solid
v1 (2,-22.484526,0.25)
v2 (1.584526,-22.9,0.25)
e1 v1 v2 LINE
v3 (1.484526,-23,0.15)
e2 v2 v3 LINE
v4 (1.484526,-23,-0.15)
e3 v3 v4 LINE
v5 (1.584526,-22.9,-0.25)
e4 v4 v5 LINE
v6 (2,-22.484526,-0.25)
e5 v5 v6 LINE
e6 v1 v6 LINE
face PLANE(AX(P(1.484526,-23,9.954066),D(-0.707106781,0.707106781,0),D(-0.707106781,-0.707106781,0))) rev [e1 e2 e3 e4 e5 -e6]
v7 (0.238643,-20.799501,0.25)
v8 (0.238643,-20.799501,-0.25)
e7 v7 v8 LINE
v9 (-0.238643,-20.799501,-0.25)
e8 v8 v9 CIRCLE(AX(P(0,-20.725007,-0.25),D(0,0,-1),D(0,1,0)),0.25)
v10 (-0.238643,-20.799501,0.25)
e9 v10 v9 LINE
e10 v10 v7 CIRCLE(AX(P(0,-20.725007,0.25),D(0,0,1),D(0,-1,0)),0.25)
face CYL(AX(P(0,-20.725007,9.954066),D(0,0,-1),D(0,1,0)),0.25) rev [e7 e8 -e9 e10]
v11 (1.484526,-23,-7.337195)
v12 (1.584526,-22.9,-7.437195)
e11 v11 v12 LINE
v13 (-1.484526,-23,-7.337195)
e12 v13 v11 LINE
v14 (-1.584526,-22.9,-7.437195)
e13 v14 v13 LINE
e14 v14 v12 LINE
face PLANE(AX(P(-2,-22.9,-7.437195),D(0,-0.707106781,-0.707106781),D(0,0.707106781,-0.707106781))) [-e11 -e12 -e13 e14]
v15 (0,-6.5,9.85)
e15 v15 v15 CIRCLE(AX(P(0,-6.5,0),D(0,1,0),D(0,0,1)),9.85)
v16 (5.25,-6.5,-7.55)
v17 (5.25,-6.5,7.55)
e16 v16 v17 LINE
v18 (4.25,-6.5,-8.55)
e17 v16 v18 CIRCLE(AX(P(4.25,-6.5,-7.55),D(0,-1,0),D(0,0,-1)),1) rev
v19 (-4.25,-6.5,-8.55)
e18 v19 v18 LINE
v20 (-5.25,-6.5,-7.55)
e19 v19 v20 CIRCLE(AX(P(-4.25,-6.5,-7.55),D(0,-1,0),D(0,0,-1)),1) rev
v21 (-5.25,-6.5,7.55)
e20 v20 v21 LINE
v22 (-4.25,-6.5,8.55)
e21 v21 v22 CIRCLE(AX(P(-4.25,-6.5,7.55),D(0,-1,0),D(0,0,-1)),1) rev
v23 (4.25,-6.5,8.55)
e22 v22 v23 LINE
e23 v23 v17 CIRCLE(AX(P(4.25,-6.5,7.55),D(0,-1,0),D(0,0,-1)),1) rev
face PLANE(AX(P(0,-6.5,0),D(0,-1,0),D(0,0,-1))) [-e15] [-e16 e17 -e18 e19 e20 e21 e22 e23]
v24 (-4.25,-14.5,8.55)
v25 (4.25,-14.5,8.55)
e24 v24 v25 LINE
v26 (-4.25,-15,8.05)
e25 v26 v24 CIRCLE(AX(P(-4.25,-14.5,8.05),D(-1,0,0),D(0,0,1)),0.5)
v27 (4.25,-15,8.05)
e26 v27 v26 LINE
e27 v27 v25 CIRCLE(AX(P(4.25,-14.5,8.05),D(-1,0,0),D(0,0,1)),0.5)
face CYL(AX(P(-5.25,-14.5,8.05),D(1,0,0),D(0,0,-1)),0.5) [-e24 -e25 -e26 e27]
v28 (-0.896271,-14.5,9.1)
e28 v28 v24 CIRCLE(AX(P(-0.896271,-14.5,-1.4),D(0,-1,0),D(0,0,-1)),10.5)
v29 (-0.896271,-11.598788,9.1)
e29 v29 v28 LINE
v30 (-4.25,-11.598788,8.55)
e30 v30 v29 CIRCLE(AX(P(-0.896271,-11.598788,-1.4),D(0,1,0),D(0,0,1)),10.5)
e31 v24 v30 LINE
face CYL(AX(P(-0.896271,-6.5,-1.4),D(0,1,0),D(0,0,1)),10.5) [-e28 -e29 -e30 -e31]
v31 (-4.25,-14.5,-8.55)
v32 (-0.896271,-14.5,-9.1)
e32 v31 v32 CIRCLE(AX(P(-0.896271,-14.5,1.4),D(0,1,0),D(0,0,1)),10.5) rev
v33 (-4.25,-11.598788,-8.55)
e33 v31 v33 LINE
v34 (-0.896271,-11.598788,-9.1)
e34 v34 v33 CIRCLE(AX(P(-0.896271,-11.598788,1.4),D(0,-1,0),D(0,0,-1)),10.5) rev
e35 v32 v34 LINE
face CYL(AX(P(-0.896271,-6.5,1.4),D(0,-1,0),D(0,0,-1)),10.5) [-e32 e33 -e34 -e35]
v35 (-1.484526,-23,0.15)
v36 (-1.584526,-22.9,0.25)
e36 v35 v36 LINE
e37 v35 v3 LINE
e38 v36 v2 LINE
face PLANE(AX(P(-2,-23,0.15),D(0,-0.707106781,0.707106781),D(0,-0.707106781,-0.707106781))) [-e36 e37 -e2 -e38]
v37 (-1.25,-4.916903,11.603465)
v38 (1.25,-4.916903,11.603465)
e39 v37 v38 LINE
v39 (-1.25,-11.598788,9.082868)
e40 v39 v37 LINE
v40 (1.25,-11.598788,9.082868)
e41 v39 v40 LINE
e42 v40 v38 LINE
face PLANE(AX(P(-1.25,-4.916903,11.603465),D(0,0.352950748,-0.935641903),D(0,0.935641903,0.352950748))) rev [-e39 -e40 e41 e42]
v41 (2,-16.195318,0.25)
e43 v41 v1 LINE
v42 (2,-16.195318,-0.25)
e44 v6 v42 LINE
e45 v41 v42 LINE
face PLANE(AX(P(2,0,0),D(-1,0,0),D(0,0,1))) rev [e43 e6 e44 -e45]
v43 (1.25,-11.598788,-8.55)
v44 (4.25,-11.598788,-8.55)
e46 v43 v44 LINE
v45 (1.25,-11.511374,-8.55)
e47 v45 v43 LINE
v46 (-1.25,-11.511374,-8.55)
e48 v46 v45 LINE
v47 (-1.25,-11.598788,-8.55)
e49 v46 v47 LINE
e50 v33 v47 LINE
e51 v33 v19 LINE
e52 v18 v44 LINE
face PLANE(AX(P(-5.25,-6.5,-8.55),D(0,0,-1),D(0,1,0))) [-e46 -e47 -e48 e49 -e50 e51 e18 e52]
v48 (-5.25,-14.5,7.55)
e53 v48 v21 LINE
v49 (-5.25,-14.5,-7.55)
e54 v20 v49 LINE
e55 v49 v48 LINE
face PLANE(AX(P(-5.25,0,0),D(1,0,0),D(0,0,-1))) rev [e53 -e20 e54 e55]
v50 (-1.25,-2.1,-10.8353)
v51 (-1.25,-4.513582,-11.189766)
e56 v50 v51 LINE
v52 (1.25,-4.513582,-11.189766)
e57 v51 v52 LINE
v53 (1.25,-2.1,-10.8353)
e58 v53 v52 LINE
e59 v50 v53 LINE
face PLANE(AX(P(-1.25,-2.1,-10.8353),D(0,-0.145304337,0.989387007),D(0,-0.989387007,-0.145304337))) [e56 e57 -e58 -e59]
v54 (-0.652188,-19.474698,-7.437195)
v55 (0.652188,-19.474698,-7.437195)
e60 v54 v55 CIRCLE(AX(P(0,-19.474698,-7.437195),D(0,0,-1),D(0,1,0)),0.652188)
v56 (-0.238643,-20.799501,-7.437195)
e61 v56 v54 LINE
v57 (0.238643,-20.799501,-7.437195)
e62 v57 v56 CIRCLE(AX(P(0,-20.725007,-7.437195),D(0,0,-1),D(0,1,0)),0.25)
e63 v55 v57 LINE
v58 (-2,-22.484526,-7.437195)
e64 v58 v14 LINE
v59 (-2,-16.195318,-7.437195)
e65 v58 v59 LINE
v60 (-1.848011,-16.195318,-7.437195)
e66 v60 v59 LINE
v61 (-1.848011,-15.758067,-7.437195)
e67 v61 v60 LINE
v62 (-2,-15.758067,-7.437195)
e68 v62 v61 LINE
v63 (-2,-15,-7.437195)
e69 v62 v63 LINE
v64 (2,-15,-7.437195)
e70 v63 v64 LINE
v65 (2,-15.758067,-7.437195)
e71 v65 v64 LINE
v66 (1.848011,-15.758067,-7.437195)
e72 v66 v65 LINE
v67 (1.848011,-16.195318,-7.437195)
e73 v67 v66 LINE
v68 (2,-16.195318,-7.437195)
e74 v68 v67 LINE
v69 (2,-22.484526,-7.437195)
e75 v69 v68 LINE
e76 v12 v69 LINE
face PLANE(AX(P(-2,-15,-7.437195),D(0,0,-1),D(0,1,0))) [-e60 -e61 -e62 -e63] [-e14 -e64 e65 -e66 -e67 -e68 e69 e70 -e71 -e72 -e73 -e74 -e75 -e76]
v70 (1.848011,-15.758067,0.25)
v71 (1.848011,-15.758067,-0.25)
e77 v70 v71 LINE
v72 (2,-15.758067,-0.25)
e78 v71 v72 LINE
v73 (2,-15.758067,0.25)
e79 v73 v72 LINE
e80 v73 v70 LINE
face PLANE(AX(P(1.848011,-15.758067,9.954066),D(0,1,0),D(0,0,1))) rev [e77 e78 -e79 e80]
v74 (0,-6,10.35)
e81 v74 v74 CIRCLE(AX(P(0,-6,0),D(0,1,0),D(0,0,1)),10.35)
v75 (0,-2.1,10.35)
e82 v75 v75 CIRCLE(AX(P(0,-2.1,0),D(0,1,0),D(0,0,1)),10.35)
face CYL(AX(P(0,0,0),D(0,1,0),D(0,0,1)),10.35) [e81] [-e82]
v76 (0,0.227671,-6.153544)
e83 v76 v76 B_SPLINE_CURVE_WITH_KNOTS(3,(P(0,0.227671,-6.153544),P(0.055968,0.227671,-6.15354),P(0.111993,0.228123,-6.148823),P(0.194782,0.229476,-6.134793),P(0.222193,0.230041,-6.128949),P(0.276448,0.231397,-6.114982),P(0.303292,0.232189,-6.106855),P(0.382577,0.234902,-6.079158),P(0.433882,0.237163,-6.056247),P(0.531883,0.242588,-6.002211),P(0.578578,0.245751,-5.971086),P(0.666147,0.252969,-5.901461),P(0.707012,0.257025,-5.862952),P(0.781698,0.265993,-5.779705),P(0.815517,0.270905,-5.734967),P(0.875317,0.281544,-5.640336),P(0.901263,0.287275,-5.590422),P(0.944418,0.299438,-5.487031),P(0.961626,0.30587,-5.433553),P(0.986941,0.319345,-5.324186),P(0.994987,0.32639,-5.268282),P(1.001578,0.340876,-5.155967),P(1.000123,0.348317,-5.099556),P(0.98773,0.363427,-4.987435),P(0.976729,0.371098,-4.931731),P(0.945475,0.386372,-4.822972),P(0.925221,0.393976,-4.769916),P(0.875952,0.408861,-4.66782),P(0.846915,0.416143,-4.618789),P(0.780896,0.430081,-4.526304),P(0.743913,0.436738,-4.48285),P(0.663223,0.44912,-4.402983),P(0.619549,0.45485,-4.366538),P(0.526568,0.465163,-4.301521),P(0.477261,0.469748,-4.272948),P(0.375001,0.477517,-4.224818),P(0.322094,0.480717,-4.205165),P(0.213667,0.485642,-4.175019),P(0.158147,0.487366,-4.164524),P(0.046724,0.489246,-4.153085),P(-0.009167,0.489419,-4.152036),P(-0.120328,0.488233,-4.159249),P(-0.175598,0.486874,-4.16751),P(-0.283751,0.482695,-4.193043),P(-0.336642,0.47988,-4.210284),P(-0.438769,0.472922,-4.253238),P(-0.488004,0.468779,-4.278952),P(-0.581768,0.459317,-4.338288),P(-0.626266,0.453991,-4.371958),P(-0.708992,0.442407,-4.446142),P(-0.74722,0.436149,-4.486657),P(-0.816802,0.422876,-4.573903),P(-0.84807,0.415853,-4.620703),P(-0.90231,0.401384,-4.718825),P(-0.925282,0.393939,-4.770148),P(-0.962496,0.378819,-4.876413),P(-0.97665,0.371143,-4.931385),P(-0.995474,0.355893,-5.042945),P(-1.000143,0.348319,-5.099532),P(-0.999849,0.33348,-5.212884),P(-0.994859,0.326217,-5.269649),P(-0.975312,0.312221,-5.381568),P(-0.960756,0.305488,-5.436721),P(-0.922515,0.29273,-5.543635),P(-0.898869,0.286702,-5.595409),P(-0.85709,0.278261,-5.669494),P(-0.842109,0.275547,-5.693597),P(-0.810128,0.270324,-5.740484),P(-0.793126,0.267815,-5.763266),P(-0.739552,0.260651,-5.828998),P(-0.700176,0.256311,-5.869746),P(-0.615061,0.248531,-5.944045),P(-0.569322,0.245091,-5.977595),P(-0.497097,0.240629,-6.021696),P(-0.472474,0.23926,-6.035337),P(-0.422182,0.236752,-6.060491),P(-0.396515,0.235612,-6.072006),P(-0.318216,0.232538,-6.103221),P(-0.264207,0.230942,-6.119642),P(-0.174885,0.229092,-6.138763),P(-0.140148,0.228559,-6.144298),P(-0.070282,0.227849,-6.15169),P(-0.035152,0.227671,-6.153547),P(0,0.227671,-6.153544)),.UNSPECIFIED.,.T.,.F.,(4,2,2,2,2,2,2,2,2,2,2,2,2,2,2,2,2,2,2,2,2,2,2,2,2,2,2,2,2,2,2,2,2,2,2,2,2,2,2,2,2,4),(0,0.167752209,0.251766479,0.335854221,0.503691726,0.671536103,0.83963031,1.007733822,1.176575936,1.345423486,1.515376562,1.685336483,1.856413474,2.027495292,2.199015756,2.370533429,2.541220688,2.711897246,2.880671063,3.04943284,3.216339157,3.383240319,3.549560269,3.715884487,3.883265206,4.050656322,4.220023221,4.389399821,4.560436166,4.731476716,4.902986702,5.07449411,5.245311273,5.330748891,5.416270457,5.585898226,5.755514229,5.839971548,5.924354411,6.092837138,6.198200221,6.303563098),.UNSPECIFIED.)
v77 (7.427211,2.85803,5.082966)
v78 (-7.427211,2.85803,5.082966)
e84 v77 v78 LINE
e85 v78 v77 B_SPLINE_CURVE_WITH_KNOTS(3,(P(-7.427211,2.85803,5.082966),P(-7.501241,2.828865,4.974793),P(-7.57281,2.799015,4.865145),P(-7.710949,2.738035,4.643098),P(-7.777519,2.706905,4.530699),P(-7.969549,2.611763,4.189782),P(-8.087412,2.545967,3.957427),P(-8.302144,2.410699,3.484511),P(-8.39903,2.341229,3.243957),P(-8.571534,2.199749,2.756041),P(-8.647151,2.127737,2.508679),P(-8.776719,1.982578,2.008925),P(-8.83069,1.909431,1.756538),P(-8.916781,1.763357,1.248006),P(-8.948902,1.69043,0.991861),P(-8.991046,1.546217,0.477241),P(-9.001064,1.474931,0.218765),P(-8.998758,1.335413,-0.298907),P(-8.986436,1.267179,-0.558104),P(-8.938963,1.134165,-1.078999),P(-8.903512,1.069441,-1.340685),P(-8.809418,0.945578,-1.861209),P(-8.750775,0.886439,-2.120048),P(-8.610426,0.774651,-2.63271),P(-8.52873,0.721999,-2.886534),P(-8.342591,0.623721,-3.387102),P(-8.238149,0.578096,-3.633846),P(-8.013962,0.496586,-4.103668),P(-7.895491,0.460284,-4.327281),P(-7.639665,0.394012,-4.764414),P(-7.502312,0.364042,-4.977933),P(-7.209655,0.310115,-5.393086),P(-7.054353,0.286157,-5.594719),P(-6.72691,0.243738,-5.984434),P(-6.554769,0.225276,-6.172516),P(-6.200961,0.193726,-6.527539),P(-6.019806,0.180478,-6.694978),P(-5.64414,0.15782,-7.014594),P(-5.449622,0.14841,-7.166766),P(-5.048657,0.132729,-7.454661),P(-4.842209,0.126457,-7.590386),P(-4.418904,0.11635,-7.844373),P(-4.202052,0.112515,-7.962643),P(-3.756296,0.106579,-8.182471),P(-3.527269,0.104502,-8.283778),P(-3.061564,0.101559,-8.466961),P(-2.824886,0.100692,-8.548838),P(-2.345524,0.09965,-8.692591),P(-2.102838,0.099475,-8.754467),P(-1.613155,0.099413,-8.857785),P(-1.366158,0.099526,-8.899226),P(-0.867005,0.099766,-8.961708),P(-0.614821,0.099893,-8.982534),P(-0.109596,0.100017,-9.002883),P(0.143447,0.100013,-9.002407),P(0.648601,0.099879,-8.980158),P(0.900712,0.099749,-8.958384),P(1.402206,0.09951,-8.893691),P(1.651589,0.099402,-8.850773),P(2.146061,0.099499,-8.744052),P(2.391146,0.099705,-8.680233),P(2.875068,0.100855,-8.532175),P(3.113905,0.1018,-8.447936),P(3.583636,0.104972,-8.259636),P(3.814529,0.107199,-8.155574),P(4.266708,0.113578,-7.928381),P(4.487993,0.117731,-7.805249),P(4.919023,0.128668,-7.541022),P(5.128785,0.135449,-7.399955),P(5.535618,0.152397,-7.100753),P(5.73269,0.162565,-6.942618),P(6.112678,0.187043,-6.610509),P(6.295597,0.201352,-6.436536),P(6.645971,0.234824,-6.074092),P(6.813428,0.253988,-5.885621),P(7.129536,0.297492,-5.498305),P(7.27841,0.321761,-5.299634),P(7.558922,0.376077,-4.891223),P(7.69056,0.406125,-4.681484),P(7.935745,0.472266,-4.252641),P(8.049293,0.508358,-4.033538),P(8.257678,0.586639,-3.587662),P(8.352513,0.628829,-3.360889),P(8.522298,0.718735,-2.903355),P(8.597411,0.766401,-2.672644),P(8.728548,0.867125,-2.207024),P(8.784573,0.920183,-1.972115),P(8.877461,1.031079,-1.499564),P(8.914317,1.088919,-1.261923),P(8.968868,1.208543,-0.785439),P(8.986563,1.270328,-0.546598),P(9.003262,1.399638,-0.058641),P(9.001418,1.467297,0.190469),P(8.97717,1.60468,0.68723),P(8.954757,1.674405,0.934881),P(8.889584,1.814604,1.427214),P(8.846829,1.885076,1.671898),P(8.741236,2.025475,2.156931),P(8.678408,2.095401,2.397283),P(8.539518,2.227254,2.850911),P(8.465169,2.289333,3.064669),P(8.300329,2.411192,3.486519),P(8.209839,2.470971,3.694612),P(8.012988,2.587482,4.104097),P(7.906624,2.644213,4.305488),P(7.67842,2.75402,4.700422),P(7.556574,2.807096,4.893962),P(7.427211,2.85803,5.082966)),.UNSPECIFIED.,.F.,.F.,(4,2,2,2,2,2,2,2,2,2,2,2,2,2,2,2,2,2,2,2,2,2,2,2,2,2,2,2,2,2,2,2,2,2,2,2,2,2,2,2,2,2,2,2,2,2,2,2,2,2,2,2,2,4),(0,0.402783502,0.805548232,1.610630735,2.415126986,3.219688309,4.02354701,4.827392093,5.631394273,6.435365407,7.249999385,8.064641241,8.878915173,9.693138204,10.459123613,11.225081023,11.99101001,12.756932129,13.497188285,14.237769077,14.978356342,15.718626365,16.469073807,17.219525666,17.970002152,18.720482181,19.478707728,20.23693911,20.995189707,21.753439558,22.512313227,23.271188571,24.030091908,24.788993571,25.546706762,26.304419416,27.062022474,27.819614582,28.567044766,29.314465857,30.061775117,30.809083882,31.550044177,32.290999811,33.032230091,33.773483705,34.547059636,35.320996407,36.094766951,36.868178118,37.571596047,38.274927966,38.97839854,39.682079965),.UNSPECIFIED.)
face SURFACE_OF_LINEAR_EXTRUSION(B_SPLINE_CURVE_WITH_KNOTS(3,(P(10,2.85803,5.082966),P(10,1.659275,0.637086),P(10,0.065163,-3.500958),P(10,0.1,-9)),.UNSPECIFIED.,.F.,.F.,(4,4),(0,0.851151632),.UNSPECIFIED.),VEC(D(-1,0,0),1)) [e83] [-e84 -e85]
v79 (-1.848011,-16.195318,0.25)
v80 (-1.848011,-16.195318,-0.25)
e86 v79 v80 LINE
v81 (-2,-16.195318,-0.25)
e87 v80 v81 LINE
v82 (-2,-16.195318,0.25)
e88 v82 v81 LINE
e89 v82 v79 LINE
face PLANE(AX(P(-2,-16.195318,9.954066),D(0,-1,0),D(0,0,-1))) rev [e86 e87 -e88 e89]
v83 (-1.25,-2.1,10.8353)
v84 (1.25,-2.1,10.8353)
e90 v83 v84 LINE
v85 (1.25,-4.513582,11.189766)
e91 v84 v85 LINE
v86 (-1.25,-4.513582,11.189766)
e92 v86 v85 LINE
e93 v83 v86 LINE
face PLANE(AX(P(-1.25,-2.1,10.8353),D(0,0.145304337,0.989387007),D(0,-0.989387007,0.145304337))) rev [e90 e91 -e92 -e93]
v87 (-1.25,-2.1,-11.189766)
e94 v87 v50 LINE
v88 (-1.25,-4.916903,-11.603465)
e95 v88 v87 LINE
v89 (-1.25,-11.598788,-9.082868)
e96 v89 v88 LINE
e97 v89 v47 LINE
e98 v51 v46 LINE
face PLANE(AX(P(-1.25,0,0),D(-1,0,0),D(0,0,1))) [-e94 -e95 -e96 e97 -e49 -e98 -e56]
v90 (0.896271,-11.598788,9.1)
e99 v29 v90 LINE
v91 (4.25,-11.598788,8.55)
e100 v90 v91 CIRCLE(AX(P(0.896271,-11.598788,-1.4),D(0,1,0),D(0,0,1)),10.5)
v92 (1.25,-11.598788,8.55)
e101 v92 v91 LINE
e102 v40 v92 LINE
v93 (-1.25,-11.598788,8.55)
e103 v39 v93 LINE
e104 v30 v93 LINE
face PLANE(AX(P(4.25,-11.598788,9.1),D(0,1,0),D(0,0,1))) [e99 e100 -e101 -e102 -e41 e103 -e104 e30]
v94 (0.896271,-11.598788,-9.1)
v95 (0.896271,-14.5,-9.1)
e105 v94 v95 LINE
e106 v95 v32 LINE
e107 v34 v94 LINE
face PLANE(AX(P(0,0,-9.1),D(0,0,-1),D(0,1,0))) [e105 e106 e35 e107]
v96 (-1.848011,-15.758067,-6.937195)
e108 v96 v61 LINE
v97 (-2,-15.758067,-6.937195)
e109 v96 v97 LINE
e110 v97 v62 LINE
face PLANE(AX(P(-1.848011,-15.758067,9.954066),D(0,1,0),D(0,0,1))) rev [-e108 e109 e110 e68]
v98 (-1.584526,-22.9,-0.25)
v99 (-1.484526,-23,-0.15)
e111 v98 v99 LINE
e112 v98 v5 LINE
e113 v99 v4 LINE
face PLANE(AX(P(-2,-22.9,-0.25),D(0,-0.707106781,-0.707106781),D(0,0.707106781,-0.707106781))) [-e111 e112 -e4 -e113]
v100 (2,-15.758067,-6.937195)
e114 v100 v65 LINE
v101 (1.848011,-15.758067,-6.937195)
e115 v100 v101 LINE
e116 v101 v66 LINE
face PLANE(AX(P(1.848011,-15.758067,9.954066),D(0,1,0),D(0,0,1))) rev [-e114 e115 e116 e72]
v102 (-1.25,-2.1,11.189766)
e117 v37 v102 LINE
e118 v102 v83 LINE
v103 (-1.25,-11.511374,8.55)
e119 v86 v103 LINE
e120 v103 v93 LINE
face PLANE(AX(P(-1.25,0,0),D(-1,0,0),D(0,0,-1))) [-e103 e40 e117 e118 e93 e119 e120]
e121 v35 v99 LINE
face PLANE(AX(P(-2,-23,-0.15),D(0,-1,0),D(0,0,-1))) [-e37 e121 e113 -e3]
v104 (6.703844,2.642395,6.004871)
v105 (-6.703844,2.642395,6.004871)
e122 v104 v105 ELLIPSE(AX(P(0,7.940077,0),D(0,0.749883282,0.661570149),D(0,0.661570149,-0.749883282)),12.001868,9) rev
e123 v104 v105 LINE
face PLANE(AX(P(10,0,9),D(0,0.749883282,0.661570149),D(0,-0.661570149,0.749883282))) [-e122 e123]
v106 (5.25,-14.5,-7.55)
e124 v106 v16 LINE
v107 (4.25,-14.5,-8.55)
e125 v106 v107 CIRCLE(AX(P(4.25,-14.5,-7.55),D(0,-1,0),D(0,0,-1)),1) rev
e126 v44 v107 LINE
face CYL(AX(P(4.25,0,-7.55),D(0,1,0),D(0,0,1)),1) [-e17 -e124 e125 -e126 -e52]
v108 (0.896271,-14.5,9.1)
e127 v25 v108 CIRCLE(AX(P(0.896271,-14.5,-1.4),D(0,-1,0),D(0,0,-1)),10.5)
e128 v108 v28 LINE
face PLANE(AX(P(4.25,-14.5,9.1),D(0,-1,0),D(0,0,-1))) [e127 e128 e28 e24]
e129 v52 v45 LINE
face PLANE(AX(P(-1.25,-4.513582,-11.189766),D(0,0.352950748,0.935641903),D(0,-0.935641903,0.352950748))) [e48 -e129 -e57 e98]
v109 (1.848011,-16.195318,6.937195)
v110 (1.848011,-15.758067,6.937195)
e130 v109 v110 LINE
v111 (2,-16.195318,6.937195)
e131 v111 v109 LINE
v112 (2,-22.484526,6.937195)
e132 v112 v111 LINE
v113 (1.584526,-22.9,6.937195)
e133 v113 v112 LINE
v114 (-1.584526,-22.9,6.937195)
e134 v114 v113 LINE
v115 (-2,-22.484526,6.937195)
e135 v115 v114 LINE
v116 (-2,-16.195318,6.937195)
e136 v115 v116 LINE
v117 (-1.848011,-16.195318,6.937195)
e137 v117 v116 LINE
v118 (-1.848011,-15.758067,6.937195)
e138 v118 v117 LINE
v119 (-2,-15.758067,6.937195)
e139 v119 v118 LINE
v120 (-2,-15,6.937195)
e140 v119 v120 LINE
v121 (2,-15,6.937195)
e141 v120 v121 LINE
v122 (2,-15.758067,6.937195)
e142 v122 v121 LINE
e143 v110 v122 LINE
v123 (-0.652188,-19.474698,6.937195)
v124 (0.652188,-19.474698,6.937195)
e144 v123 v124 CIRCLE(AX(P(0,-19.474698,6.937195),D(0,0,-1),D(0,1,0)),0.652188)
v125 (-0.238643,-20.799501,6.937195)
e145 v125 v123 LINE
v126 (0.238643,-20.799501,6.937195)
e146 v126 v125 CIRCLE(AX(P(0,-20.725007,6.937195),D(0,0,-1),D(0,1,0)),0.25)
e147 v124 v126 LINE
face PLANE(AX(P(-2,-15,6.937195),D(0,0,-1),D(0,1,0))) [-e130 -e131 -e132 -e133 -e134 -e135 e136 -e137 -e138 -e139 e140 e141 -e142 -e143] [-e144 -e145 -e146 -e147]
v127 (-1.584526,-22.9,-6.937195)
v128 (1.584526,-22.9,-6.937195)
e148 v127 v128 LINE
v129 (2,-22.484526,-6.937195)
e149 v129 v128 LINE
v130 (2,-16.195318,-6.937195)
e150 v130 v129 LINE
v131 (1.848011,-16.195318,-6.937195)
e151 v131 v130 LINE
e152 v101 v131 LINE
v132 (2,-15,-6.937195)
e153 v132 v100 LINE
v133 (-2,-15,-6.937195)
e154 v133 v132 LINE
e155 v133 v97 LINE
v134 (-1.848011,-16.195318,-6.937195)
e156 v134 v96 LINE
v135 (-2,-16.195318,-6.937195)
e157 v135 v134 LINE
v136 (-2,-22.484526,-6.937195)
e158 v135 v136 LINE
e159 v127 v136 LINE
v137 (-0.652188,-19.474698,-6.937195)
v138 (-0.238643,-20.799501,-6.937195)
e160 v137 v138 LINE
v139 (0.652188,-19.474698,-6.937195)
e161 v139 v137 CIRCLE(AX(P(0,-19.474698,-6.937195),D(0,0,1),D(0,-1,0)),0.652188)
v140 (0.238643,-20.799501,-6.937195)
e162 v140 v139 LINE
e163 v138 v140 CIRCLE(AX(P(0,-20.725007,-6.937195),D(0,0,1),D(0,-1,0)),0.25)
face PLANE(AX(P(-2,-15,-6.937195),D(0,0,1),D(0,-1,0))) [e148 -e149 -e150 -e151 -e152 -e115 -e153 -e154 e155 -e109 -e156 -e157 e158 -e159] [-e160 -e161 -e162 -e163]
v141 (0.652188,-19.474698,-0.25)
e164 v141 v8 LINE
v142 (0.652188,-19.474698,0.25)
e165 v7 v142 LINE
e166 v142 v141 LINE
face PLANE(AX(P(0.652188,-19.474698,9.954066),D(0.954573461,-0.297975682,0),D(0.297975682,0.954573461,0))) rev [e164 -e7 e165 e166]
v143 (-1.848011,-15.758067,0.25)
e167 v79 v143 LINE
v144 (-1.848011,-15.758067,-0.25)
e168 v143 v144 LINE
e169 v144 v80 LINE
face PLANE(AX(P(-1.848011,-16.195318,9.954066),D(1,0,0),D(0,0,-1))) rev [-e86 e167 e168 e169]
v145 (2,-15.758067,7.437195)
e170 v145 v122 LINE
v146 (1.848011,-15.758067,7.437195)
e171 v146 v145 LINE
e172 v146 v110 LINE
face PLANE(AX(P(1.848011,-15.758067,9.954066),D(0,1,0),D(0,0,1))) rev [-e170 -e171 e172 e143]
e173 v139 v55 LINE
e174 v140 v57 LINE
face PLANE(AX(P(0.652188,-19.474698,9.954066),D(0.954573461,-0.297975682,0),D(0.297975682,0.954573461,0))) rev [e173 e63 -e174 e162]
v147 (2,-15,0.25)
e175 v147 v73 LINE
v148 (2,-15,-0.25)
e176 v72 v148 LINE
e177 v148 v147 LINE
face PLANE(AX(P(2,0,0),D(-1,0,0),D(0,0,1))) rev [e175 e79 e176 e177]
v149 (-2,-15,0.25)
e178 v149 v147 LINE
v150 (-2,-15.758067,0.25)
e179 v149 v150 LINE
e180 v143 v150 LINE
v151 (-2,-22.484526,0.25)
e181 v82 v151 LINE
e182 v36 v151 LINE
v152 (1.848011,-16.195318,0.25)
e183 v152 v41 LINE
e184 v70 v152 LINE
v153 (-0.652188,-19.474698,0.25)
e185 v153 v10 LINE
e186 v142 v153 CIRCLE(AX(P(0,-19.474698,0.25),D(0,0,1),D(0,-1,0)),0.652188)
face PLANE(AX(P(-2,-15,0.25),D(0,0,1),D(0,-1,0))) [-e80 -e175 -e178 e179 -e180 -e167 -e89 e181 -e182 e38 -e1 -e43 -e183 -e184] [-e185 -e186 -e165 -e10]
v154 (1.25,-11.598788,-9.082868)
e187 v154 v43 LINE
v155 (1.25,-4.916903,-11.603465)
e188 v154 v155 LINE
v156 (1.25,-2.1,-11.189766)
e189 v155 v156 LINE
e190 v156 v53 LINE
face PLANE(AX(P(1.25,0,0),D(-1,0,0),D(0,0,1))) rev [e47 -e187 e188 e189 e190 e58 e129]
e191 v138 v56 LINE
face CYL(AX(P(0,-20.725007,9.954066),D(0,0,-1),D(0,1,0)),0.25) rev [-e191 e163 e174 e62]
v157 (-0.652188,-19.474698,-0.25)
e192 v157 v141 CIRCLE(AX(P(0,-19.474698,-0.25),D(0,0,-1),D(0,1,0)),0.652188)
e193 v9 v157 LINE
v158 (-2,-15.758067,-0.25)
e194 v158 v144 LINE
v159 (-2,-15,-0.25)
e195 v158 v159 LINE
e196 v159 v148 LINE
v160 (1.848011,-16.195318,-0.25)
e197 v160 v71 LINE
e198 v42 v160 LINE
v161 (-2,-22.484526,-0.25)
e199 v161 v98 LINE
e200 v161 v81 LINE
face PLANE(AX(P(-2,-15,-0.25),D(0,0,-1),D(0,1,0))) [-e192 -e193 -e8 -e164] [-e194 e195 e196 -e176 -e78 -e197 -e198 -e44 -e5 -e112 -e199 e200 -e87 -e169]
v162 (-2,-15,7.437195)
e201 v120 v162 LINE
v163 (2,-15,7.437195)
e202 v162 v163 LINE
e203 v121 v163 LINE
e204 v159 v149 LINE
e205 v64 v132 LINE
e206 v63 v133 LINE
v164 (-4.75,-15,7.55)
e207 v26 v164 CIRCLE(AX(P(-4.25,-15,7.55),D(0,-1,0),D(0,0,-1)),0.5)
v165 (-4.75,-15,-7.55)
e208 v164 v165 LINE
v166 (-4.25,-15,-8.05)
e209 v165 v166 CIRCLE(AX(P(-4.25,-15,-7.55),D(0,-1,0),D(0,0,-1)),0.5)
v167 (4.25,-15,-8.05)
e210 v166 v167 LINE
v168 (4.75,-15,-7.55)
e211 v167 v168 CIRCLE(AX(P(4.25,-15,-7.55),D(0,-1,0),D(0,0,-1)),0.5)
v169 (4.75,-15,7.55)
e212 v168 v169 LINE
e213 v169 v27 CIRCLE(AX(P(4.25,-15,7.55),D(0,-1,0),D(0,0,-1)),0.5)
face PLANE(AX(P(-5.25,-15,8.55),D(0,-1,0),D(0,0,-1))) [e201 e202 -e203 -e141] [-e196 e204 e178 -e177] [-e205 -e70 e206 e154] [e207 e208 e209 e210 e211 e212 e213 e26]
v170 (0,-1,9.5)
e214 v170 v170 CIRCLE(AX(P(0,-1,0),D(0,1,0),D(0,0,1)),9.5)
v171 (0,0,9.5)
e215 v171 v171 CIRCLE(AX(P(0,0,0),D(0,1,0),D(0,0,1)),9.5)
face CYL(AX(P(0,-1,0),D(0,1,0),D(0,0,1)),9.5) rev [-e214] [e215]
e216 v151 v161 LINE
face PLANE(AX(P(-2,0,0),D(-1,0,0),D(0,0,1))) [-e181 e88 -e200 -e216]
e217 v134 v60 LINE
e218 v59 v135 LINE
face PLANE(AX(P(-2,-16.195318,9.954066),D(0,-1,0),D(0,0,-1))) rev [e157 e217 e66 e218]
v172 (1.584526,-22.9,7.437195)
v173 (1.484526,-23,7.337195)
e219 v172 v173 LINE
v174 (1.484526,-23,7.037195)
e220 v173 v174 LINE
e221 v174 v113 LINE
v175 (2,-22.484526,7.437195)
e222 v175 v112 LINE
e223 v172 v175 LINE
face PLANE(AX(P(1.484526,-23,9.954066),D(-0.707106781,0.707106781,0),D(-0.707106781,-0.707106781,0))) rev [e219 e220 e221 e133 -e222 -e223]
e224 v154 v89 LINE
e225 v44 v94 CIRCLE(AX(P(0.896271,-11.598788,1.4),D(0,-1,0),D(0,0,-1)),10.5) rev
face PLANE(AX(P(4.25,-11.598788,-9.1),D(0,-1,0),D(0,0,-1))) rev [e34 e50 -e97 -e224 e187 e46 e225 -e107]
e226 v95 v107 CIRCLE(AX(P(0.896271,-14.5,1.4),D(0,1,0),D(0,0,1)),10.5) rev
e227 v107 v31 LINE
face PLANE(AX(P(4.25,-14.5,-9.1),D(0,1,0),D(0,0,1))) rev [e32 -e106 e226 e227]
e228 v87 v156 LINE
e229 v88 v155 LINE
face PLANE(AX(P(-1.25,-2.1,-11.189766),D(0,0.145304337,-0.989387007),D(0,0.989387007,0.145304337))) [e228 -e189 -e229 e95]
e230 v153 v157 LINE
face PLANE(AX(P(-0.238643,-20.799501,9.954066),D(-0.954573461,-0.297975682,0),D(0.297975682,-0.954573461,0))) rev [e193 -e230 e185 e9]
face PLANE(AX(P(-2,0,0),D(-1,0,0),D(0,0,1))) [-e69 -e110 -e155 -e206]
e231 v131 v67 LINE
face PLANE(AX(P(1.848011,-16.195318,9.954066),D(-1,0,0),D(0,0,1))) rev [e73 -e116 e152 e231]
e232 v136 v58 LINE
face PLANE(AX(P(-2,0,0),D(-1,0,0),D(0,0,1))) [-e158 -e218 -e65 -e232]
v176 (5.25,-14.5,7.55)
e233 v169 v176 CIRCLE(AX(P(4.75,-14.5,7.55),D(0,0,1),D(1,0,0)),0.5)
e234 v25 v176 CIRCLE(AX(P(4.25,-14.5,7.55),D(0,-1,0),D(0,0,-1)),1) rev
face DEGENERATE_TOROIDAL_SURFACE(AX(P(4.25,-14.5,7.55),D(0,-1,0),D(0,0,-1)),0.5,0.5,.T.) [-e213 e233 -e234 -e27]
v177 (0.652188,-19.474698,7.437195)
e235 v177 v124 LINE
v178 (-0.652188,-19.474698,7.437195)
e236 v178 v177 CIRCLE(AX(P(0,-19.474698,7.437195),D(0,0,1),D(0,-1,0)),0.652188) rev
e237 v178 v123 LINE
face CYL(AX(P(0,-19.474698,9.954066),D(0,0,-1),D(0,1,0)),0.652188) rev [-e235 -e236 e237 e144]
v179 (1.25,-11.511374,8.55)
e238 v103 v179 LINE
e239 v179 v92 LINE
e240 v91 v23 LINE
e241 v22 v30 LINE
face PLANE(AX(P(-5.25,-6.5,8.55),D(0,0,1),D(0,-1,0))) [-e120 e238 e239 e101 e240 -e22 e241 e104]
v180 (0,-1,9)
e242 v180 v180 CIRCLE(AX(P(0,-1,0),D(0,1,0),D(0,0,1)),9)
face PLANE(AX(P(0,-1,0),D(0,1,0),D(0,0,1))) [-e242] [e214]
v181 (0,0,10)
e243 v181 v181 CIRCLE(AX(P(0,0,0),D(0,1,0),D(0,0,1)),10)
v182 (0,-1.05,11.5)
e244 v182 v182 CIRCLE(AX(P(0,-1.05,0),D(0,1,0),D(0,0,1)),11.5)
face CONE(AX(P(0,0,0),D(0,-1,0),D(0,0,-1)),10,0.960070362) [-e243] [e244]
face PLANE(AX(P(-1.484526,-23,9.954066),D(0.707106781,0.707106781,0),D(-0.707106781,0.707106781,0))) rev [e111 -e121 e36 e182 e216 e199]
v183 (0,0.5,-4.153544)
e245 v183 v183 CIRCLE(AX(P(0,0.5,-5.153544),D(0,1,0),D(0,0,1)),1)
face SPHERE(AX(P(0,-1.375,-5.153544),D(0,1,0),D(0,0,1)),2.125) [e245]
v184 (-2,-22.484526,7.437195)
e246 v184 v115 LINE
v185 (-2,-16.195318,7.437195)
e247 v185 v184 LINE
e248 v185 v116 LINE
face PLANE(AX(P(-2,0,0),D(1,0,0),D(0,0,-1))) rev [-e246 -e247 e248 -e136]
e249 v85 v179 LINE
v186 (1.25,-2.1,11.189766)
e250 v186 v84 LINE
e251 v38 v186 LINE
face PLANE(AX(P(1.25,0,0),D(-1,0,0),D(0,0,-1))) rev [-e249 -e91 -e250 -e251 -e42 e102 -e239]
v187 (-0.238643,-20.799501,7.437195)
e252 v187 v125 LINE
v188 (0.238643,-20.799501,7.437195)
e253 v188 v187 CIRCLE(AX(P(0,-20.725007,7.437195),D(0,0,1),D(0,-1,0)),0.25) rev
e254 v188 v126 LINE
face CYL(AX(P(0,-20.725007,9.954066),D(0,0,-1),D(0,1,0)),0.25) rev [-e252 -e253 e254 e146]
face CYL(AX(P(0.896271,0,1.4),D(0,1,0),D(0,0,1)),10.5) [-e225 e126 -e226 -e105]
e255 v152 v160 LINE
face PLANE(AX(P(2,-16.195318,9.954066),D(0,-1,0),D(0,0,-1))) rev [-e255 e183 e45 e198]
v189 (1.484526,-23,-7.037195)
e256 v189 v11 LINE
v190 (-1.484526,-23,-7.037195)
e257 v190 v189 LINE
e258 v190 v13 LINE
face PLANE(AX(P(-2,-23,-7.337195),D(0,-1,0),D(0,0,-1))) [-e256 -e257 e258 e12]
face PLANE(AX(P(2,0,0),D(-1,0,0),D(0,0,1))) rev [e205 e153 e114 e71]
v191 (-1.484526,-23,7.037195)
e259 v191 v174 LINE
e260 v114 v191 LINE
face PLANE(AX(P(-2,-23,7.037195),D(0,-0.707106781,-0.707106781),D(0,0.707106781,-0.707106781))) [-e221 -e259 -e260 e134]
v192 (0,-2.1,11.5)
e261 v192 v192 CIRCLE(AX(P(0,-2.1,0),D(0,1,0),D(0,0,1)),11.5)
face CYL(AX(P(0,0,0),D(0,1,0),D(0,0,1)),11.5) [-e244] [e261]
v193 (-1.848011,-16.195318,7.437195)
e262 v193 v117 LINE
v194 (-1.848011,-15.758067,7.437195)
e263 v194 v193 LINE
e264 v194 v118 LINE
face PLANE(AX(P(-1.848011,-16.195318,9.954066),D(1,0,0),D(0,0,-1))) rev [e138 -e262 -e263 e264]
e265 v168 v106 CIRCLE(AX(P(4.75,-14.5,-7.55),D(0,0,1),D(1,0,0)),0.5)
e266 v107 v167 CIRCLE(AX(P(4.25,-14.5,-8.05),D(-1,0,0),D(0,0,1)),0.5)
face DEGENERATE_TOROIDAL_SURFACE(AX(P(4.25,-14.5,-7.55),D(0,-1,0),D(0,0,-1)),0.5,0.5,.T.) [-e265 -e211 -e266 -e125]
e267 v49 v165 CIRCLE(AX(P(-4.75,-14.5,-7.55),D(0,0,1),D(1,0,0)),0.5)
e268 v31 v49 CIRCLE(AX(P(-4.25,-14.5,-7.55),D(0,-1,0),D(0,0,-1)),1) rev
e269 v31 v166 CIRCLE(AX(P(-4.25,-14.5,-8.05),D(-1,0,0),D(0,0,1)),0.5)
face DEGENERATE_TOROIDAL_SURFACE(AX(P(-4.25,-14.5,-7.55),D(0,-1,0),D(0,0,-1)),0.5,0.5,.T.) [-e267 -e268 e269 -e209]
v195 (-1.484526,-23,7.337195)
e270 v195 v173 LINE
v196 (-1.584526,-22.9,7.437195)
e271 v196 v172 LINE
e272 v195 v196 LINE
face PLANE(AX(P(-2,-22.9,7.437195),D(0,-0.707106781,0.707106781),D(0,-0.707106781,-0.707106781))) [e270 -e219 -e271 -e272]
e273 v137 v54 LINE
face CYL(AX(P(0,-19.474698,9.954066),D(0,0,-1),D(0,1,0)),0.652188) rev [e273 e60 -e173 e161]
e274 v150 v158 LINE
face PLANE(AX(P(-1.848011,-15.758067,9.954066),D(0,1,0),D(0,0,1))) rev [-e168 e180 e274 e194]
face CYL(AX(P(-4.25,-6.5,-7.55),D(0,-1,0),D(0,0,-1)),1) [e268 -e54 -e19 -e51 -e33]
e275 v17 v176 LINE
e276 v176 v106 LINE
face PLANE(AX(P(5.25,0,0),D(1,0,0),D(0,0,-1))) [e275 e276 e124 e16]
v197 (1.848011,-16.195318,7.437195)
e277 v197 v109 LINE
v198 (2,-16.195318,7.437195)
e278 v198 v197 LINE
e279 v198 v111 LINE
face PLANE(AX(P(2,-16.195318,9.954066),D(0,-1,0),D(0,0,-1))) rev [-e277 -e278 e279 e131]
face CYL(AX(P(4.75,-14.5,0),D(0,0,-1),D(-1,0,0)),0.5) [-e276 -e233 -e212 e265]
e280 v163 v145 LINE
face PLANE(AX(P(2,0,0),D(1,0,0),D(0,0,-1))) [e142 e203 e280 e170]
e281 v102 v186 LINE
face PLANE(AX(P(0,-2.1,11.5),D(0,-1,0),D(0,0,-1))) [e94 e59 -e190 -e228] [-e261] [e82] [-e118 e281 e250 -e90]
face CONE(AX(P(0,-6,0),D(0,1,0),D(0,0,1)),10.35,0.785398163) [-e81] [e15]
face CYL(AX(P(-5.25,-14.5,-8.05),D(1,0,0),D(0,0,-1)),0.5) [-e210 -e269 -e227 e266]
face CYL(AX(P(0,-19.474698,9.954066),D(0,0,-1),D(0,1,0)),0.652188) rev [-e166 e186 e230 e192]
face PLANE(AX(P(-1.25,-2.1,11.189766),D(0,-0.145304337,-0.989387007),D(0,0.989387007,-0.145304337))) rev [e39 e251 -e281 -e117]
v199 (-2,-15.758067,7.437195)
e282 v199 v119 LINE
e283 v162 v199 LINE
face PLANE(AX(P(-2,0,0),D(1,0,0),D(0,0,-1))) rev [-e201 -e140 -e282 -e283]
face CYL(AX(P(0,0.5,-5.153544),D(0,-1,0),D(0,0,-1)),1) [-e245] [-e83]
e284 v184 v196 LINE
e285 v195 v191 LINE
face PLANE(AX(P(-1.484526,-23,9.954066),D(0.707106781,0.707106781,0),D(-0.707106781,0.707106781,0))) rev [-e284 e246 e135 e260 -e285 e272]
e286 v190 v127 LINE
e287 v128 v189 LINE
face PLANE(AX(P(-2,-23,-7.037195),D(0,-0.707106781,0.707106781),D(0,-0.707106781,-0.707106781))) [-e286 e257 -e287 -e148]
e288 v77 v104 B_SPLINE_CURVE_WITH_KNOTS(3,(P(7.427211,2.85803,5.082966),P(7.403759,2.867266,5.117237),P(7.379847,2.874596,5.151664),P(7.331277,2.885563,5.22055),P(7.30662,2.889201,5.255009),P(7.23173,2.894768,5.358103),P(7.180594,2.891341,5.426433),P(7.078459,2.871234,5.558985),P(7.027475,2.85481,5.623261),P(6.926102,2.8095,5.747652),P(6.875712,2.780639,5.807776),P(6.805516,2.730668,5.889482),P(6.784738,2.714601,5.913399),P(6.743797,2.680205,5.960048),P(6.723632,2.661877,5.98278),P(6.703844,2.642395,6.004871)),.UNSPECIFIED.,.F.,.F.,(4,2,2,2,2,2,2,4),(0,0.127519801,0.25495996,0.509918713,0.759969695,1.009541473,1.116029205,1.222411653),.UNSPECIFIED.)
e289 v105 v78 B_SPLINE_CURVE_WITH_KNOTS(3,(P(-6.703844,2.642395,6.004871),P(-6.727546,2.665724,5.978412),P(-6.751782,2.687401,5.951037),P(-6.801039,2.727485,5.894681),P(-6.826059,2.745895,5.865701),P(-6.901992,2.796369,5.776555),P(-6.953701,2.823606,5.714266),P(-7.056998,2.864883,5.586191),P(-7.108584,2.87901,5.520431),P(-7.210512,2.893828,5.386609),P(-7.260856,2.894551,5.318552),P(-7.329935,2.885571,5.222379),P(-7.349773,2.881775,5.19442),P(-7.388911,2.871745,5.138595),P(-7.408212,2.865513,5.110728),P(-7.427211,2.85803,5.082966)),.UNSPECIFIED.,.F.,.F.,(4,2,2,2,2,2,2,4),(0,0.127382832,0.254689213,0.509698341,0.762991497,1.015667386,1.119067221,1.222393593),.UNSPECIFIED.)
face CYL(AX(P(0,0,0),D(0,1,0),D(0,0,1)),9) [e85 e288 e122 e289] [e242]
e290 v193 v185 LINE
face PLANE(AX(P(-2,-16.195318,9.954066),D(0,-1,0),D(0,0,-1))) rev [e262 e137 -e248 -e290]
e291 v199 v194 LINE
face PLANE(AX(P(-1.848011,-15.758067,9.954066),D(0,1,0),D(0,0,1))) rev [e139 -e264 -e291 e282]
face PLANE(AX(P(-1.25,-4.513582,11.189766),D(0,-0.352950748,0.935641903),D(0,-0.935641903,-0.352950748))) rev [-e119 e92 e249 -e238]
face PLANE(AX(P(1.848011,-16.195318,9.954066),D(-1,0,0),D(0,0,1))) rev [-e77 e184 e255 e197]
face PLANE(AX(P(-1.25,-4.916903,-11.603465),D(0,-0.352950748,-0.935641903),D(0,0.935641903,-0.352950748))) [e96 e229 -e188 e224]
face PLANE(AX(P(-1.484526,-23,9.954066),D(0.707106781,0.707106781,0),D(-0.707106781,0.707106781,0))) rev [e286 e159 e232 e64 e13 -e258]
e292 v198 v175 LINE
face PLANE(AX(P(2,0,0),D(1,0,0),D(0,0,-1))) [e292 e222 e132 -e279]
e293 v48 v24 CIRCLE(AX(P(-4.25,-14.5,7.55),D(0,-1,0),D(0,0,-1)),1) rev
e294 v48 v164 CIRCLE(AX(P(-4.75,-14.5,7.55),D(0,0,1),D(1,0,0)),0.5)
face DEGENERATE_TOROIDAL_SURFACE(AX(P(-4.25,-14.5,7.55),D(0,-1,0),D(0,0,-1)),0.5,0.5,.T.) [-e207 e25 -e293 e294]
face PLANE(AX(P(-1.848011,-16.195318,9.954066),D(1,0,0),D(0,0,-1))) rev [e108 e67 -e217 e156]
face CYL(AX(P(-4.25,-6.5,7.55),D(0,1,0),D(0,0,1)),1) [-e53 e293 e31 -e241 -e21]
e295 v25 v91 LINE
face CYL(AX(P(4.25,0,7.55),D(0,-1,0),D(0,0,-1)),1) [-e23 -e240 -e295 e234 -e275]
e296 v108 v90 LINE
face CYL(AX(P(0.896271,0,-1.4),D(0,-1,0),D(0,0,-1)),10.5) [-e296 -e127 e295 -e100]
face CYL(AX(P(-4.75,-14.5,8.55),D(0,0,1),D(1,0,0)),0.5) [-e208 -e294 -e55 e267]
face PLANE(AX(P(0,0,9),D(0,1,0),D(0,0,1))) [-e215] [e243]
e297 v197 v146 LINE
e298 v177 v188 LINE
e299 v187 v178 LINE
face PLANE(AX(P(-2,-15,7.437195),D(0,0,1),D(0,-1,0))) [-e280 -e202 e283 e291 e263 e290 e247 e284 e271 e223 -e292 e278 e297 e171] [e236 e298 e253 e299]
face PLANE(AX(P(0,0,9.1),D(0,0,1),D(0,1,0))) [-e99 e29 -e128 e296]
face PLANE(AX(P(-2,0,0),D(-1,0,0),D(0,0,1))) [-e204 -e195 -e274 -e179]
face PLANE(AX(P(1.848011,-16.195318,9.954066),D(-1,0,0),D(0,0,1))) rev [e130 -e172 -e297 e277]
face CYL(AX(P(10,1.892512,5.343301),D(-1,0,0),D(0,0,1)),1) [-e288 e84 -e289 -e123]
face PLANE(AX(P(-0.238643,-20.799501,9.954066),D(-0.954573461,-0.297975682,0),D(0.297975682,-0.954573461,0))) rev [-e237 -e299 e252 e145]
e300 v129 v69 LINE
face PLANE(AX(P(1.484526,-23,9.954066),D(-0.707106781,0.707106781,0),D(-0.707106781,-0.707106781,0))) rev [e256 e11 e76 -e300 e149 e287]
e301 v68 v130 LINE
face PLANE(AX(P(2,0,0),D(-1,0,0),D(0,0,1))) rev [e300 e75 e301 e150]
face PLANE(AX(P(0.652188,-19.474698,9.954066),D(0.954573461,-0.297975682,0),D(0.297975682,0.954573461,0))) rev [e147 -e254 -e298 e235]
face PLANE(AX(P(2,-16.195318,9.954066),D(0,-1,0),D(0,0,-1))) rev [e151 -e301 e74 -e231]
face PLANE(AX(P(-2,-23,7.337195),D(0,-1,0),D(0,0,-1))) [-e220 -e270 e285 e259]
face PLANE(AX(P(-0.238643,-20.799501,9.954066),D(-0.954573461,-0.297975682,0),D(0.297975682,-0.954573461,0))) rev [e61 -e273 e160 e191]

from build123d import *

# Parameters (mm, degrees)
CUT_EXTRUDE1_DEPTH       = 10
CUT_EXTRUDE1_DEPTH_BACK  = 10
SKETCH4_R                = 9.5
SKETCH4_R_2              = 9
CUT_EXTRUDE2_DEPTH       = 1
BOSS_EXTRUDE1_DEPTH      = 5.25
BOSS_EXTRUDE1_DEPTH_BACK = 5.25
SKETCH5_W                = 17.1
SKETCH5_H                = 8.5
FILLET1_R                = 1
FILLET2_R                = 0.5
BOSS_EXTRUDE2_DEPTH      = 2
BOSS_EXTRUDE2_DEPTH_BACK = 2
CUT_EXTRUDE4_REACH       = 33.935
SKETCH7_W                = 0.15198881
SKETCH7_H                = 0.437250331
SKETCH8_R                = 1
BOSS_EXTRUDE4_DEPTH      = 0.5
DOME1_FACE_RADIUS        = 1
DOME1_HEIGHT             = 0.25
BOSS_EXTRUDE5_DEPTH      = 1.25
SKETCH11_W               = 8.5
SKETCH11_H               = 2.901212209
BOSS_EXTRUDE6_DEPTH      = 0.55
FILLET3_R                = 10.5
MIRROR2_START            = -14.5
MIRROR2_DEPTH            = 2.901212209


# Read off the part's stored shape, not the designer's step: Mirror2
with BuildPart() as part:
    # Sketch1 → Revolve1 (revolve)
    with BuildSketch(Plane(origin=(0, 0, 0), x_dir=(0, 0, -1), z_dir=(1, 0, 0))):
        Polygon((0, -6.5), (-9.85, -6.5), (-10.35, -6), (-10.35, -2.1), (-11.5, -2.1), (-11.5, -1.05), (-10, 0), (-9, 0), (-9, 3), (0, 3), (0, 0), align=None)
    revolve(axis=Axis((0, 0, 0), (0, -1, 0)))

    # Sketch3 → Cut-Extrude1 (cut, two sides: drawn at the far end of the back side and taken through both)
    with BuildSketch(Plane(origin=(0, 0, 0), x_dir=(0, 0, -1), z_dir=(1, 0, 0)).offset(-CUT_EXTRUDE1_DEPTH_BACK)):
        with BuildLine():
            Line((-9, 0), (-6.004871006, 2.642395133))
            ThreePointArc((-6.004871006, 2.642395133), (-5.571055004, 2.86623052), (-5.082965507, 2.858030108))
            add(Edge.make_bspline(
                [(9, 0.1), (3.500957761, 0.065162529), (-0.63708622, 1.659275419), (-5.082965507, 2.858030108)],
                knots=[0, 0, 0, 0, 0.851151632, 0.851151632, 0.851151632, 0.851151632], degree=3))
            Line((9, 0.1), (9, 3))
            Line((9, 3), (-9, 3))
            Line((-9, 3), (-9, 0))
        make_face()
    extrude(amount=CUT_EXTRUDE1_DEPTH + CUT_EXTRUDE1_DEPTH_BACK, mode=Mode.SUBTRACT)

    # Sketch4 → Cut-Extrude2 (cut)
    with BuildSketch(Plane(origin=(0, 0, 0), x_dir=(1, 0, 0), z_dir=(0, 1, 0))):
        with Locations(Location((0, 0, 0), (0, 0, 270))):
            Circle(SKETCH4_R)
        with Locations(Location((0, 0, 0), (0, 0, 270))):
            Circle(SKETCH4_R_2, mode=Mode.SUBTRACT)
    extrude(amount=-CUT_EXTRUDE2_DEPTH, mode=Mode.SUBTRACT)

    # Sketch5 → Boss-Extrude1 (add, two sides: drawn at the far end of the back side and taken through both)
    with BuildSketch(Plane(origin=(0, 0, 0), x_dir=(0, 0, -1), z_dir=(1, 0, 0)).offset(-BOSS_EXTRUDE1_DEPTH_BACK)):
        with Locations((0, -10.75)):
            Rectangle(SKETCH5_W, SKETCH5_H)
    extrude(amount=BOSS_EXTRUDE1_DEPTH + BOSS_EXTRUDE1_DEPTH_BACK)

    # Fillet1
    # the kernel refuses this fillet: 1 mm, written as the material it takes off along each edge
    with BuildSketch(Plane(origin=(-5.25, -17.5, 8.55), x_dir=(1, 0, 0), z_dir=(0, 1, 0)), Plane(origin=(5.25, -6.5, -8.55), x_dir=(0, 0, 1), z_dir=(0, -1, 0))) as fillet1_piece_1:
        with BuildLine():
            CenterArc((FILLET1_R, FILLET1_R), FILLET1_R, 180, 90)
            Line((0, FILLET1_R), (0, 0))
            Line((0, 0), (FILLET1_R, 0))
        make_face()
    extrude(amount=11, mode=Mode.SUBTRACT)
    with BuildSketch(Plane(origin=(-5.25, -6.5, -8.55), x_dir=(0, 0, 1), z_dir=(0, -1, 0)), Plane(origin=(5.25, -17.5, 8.55), x_dir=(-1, 0, 0), z_dir=(0, 1, 0))) as fillet1_piece_2:
        with BuildLine():
            CenterArc((FILLET1_R, -FILLET1_R), FILLET1_R, 90, 90)
            Line((0, -FILLET1_R), (0, 0))
            Line((0, 0), (FILLET1_R, 0))
        make_face()
    extrude(amount=11, mode=Mode.SUBTRACT)

    # Fillet2
    fillet2_edges = [part.edges().sort_by_distance(p)[0] for p in [
        (0, -15, 8.55),
        (0, -15, -8.55),
        (5.25, -15, 0),
        (-5.25, -15, 0),
        (4.957106781, -15, 8.257106781),
        (4.957106781, -15, -8.257106781),
        (-4.957106781, -15, -8.257106781),
        (-4.957106781, -15, 8.257106781),
    ]]
    fillet(fillet2_edges, radius=FILLET2_R)

    # Sketch6 → Boss-Extrude2 (add, two sides: drawn at the far end of the back side and taken through both)
    with BuildSketch(Plane(origin=(0, 0, 0), x_dir=(0, 0, -1), z_dir=(1, 0, 0)).offset(-BOSS_EXTRUDE2_DEPTH_BACK)):
        Polygon((0.25, -15), (-0.25, -15), (-0.25, -22.9), (-0.15, -23), (0.15, -23), (0.25, -22.9), align=None)
        Polygon((-7.337194576, -23), (-7.037194576, -23), (-6.937194576, -22.9), (-6.937194576, -15), (-7.437194576, -15), (-7.437194576, -22.9), align=None)
        Polygon((7.437194576, -22.9), (7.337194576, -23), (7.037194576, -23), (6.937194576, -22.9), (6.937194576, -15), (7.437194576, -15), align=None)
    extrude(amount=BOSS_EXTRUDE2_DEPTH + BOSS_EXTRUDE2_DEPTH_BACK)

    # Cut-Extrude4: up to this face of the body (flat: up to its plane)
    cut_extrude4_end = Plane(part.part.faces().sort_by_distance((0, -18.95, 7.437194576))[0])
    # Sketch7 → Cut-Extrude4 (cut, up to the picked face)
    with BuildSketch(Plane(origin=(0, 0, -7.437194576), x_dir=(-1, 0, 0), z_dir=(0, 0, -1)), mode=Mode.PRIVATE) as cut_extrude4_sk1:
        Polygon((1.48452642, -23), (2, -22.48452642), (2, -23), align=None)
    cut_extrude4_tool1 = split(extrude(cut_extrude4_sk1.sketch, amount=-CUT_EXTRUDE4_REACH, mode=Mode.PRIVATE), bisect_by=cut_extrude4_end, keep=Keep.BOTH, mode=Mode.PRIVATE)
    # Sketch7 → Cut-Extrude4 (cut, up to the picked face)
    with BuildSketch(Plane(origin=(0, 0, -7.437194576), x_dir=(-1, 0, 0), z_dir=(0, 0, -1)), mode=Mode.PRIVATE) as cut_extrude4_sk2:
        with Locations((1.924005595, -15.976692476)):
            Rectangle(SKETCH7_W, SKETCH7_H)
    cut_extrude4_tool2 = split(extrude(cut_extrude4_sk2.sketch, amount=-CUT_EXTRUDE4_REACH, mode=Mode.PRIVATE), bisect_by=cut_extrude4_end, keep=Keep.BOTH, mode=Mode.PRIVATE)
    # Sketch7 → Cut-Extrude4 (cut, up to the picked face)
    with BuildSketch(Plane(origin=(0, 0, -7.437194576), x_dir=(-1, 0, 0), z_dir=(0, 0, -1)), mode=Mode.PRIVATE) as cut_extrude4_sk3:
        with Locations((-1.924005595, -15.976692476)):
            Rectangle(SKETCH7_W, SKETCH7_H)
    cut_extrude4_tool3 = split(extrude(cut_extrude4_sk3.sketch, amount=-CUT_EXTRUDE4_REACH, mode=Mode.PRIVATE), bisect_by=cut_extrude4_end, keep=Keep.BOTH, mode=Mode.PRIVATE)
    # Sketch7 → Cut-Extrude4 (cut, up to the picked face)
    with BuildSketch(Plane(origin=(0, 0, -7.437194576), x_dir=(-1, 0, 0), z_dir=(0, 0, -1)), mode=Mode.PRIVATE) as cut_extrude4_sk4:
        Polygon((-1.48452642, -23), (-2, -22.48452642), (-2, -23), align=None)
    cut_extrude4_tool4 = split(extrude(cut_extrude4_sk4.sketch, amount=-CUT_EXTRUDE4_REACH, mode=Mode.PRIVATE), bisect_by=cut_extrude4_end, keep=Keep.BOTH, mode=Mode.PRIVATE)
    # Sketch7 → Cut-Extrude4 (cut, up to the picked face)
    with BuildSketch(Plane(origin=(0, 0, -7.437194576), x_dir=(-1, 0, 0), z_dir=(0, 0, -1)), mode=Mode.PRIVATE) as cut_extrude4_sk5:
        with BuildLine():
            Line((-0.652188184, -19.474698282), (-0.238643365, -20.799500715))
            ThreePointArc((-0.238643365, -20.799500715), (0, -20.975006794), (0.238643365, -20.799500715))
            Line((0.238643365, -20.799500715), (0.652188184, -19.474698282))
            ThreePointArc((0.652188184, -19.474698282), (0, -18.822510099), (-0.652188184, -19.474698282))
        make_face()
    cut_extrude4_tool5 = split(extrude(cut_extrude4_sk5.sketch, amount=-CUT_EXTRUDE4_REACH, mode=Mode.PRIVATE), bisect_by=cut_extrude4_end, keep=Keep.BOTH, mode=Mode.PRIVATE)
    add(cut_extrude4_tool1.solids().sort_by(Axis((-1.828175, -22.828175, -7.437195), (0, 0, 1)))[0], mode=Mode.SUBTRACT)
    add(cut_extrude4_tool2.solids().sort_by(Axis((-1.924006, -15.976692, -7.437195), (0, 0, 1)))[0], mode=Mode.SUBTRACT)
    add(cut_extrude4_tool3.solids().sort_by(Axis((1.924006, -15.976692, -7.437195), (0, 0, 1)))[0], mode=Mode.SUBTRACT)
    add(cut_extrude4_tool4.solids().sort_by(Axis((1.828175, -22.828175, -7.437195), (0, 0, 1)))[0], mode=Mode.SUBTRACT)
    add(cut_extrude4_tool5.solids().sort_by(Axis((0, -19.768855, -7.437195), (0, 0, 1)))[0], mode=Mode.SUBTRACT)

    # Sketch8 → Boss-Extrude4 (add)
    with BuildSketch(Plane(origin=(0, 0, 0), x_dir=(1, 0, 0), z_dir=(0, 1, 0))):
        with Locations(Location((0, 5.153544254, 0), (0, 0, 90))):
            Circle(SKETCH8_R)
    extrude(amount=BOSS_EXTRUDE4_DEPTH)

    # Dome1: a dome of height H over a round flat face of radius A is a cap of a sphere of radius (A * A + H * H) / (2 * H)
    dome1_r = (DOME1_FACE_RADIUS * DOME1_FACE_RADIUS + DOME1_HEIGHT * DOME1_HEIGHT) / (2 * DOME1_HEIGHT)
    dome1_base = Plane((0, 0.5, -5.153544254), z_dir=(0, 1, 0))
    with Locations(dome1_base.offset(DOME1_HEIGHT - dome1_r)):
        dome1_ball = Sphere(dome1_r, mode=Mode.PRIVATE)
    add(split(dome1_ball, bisect_by=dome1_base, keep=Keep.TOP, mode=Mode.PRIVATE))

    # Sketch9 → Boss-Extrude5 (add, symmetric)
    with BuildSketch(Plane(origin=(0, 0, 0), x_dir=(0, 0, -1), z_dir=(1, 0, 0))):
        Polygon((11.189766079, -2.1), (11.603464839, -4.916902693), (8.55, -13.011373866), (8.55, -11.511373866), (11.189766079, -4.513582322), (10.835300156, -2.1), align=None)
    boss_extrude5 = extrude(amount=BOSS_EXTRUDE5_DEPTH, both=True)

    # Mirror1: Boss-Extrude5 across plane
    add(boss_extrude5.mirror(Plane.XY))

    # Sketch11 → Boss-Extrude6 (add)
    with BuildSketch(Plane(origin=(0, 0, -8.55), x_dir=(-1, 0, 0), z_dir=(0, 0, -1))):
        with Locations((0, -13.049393896)):
            Rectangle(SKETCH11_W, SKETCH11_H)
    extrude(amount=BOSS_EXTRUDE6_DEPTH)

    # Fillet3
    # the kernel refuses this fillet: 10.5 mm, written as the material it takes off along each edge
    with BuildSketch(Plane(origin=(4.25, -22.884323169, -9.1), x_dir=(-1.1142601992564705e-12, 0, 1.0), z_dir=(0, 1, 0)), Plane(origin=(-4.25, -11.598787791, -9.1), x_dir=(1.1142601992564705e-12, 0, 1.0), z_dir=(0, -1, 0))) as fillet3_piece_1:
        with BuildLine():
            CenterArc((10.5, -3.353729268), FILLET3_R, 161.37318815, 18.62681185)
            Line((0, -3.353729268), (0, 0))
            Line((0, 0), (0.55, 0))
        make_face()
    extrude(amount=11.285535378, mode=Mode.SUBTRACT)

    # Mirror2 outline → Mirror2 (add)
    with BuildSketch(Plane(origin=(0, 0, 0), x_dir=(1, 0, 0), z_dir=(0, 1, 0)).offset(MIRROR2_START)):
        with BuildLine():
            Line((-0.896270732, -9.1), (0.896270732, -9.1))
            ThreePointArc((0.896270732, -9.1), (2.595535279, -8.961587716), (4.25, -8.55))
            Line((4.25, -8.55), (-4.25, -8.55))
            ThreePointArc((-4.25, -8.55), (-2.595535279, -8.961587716), (-0.896270732, -9.1))
        make_face()
    extrude(amount=MIRROR2_DEPTH)


solid = part.part
